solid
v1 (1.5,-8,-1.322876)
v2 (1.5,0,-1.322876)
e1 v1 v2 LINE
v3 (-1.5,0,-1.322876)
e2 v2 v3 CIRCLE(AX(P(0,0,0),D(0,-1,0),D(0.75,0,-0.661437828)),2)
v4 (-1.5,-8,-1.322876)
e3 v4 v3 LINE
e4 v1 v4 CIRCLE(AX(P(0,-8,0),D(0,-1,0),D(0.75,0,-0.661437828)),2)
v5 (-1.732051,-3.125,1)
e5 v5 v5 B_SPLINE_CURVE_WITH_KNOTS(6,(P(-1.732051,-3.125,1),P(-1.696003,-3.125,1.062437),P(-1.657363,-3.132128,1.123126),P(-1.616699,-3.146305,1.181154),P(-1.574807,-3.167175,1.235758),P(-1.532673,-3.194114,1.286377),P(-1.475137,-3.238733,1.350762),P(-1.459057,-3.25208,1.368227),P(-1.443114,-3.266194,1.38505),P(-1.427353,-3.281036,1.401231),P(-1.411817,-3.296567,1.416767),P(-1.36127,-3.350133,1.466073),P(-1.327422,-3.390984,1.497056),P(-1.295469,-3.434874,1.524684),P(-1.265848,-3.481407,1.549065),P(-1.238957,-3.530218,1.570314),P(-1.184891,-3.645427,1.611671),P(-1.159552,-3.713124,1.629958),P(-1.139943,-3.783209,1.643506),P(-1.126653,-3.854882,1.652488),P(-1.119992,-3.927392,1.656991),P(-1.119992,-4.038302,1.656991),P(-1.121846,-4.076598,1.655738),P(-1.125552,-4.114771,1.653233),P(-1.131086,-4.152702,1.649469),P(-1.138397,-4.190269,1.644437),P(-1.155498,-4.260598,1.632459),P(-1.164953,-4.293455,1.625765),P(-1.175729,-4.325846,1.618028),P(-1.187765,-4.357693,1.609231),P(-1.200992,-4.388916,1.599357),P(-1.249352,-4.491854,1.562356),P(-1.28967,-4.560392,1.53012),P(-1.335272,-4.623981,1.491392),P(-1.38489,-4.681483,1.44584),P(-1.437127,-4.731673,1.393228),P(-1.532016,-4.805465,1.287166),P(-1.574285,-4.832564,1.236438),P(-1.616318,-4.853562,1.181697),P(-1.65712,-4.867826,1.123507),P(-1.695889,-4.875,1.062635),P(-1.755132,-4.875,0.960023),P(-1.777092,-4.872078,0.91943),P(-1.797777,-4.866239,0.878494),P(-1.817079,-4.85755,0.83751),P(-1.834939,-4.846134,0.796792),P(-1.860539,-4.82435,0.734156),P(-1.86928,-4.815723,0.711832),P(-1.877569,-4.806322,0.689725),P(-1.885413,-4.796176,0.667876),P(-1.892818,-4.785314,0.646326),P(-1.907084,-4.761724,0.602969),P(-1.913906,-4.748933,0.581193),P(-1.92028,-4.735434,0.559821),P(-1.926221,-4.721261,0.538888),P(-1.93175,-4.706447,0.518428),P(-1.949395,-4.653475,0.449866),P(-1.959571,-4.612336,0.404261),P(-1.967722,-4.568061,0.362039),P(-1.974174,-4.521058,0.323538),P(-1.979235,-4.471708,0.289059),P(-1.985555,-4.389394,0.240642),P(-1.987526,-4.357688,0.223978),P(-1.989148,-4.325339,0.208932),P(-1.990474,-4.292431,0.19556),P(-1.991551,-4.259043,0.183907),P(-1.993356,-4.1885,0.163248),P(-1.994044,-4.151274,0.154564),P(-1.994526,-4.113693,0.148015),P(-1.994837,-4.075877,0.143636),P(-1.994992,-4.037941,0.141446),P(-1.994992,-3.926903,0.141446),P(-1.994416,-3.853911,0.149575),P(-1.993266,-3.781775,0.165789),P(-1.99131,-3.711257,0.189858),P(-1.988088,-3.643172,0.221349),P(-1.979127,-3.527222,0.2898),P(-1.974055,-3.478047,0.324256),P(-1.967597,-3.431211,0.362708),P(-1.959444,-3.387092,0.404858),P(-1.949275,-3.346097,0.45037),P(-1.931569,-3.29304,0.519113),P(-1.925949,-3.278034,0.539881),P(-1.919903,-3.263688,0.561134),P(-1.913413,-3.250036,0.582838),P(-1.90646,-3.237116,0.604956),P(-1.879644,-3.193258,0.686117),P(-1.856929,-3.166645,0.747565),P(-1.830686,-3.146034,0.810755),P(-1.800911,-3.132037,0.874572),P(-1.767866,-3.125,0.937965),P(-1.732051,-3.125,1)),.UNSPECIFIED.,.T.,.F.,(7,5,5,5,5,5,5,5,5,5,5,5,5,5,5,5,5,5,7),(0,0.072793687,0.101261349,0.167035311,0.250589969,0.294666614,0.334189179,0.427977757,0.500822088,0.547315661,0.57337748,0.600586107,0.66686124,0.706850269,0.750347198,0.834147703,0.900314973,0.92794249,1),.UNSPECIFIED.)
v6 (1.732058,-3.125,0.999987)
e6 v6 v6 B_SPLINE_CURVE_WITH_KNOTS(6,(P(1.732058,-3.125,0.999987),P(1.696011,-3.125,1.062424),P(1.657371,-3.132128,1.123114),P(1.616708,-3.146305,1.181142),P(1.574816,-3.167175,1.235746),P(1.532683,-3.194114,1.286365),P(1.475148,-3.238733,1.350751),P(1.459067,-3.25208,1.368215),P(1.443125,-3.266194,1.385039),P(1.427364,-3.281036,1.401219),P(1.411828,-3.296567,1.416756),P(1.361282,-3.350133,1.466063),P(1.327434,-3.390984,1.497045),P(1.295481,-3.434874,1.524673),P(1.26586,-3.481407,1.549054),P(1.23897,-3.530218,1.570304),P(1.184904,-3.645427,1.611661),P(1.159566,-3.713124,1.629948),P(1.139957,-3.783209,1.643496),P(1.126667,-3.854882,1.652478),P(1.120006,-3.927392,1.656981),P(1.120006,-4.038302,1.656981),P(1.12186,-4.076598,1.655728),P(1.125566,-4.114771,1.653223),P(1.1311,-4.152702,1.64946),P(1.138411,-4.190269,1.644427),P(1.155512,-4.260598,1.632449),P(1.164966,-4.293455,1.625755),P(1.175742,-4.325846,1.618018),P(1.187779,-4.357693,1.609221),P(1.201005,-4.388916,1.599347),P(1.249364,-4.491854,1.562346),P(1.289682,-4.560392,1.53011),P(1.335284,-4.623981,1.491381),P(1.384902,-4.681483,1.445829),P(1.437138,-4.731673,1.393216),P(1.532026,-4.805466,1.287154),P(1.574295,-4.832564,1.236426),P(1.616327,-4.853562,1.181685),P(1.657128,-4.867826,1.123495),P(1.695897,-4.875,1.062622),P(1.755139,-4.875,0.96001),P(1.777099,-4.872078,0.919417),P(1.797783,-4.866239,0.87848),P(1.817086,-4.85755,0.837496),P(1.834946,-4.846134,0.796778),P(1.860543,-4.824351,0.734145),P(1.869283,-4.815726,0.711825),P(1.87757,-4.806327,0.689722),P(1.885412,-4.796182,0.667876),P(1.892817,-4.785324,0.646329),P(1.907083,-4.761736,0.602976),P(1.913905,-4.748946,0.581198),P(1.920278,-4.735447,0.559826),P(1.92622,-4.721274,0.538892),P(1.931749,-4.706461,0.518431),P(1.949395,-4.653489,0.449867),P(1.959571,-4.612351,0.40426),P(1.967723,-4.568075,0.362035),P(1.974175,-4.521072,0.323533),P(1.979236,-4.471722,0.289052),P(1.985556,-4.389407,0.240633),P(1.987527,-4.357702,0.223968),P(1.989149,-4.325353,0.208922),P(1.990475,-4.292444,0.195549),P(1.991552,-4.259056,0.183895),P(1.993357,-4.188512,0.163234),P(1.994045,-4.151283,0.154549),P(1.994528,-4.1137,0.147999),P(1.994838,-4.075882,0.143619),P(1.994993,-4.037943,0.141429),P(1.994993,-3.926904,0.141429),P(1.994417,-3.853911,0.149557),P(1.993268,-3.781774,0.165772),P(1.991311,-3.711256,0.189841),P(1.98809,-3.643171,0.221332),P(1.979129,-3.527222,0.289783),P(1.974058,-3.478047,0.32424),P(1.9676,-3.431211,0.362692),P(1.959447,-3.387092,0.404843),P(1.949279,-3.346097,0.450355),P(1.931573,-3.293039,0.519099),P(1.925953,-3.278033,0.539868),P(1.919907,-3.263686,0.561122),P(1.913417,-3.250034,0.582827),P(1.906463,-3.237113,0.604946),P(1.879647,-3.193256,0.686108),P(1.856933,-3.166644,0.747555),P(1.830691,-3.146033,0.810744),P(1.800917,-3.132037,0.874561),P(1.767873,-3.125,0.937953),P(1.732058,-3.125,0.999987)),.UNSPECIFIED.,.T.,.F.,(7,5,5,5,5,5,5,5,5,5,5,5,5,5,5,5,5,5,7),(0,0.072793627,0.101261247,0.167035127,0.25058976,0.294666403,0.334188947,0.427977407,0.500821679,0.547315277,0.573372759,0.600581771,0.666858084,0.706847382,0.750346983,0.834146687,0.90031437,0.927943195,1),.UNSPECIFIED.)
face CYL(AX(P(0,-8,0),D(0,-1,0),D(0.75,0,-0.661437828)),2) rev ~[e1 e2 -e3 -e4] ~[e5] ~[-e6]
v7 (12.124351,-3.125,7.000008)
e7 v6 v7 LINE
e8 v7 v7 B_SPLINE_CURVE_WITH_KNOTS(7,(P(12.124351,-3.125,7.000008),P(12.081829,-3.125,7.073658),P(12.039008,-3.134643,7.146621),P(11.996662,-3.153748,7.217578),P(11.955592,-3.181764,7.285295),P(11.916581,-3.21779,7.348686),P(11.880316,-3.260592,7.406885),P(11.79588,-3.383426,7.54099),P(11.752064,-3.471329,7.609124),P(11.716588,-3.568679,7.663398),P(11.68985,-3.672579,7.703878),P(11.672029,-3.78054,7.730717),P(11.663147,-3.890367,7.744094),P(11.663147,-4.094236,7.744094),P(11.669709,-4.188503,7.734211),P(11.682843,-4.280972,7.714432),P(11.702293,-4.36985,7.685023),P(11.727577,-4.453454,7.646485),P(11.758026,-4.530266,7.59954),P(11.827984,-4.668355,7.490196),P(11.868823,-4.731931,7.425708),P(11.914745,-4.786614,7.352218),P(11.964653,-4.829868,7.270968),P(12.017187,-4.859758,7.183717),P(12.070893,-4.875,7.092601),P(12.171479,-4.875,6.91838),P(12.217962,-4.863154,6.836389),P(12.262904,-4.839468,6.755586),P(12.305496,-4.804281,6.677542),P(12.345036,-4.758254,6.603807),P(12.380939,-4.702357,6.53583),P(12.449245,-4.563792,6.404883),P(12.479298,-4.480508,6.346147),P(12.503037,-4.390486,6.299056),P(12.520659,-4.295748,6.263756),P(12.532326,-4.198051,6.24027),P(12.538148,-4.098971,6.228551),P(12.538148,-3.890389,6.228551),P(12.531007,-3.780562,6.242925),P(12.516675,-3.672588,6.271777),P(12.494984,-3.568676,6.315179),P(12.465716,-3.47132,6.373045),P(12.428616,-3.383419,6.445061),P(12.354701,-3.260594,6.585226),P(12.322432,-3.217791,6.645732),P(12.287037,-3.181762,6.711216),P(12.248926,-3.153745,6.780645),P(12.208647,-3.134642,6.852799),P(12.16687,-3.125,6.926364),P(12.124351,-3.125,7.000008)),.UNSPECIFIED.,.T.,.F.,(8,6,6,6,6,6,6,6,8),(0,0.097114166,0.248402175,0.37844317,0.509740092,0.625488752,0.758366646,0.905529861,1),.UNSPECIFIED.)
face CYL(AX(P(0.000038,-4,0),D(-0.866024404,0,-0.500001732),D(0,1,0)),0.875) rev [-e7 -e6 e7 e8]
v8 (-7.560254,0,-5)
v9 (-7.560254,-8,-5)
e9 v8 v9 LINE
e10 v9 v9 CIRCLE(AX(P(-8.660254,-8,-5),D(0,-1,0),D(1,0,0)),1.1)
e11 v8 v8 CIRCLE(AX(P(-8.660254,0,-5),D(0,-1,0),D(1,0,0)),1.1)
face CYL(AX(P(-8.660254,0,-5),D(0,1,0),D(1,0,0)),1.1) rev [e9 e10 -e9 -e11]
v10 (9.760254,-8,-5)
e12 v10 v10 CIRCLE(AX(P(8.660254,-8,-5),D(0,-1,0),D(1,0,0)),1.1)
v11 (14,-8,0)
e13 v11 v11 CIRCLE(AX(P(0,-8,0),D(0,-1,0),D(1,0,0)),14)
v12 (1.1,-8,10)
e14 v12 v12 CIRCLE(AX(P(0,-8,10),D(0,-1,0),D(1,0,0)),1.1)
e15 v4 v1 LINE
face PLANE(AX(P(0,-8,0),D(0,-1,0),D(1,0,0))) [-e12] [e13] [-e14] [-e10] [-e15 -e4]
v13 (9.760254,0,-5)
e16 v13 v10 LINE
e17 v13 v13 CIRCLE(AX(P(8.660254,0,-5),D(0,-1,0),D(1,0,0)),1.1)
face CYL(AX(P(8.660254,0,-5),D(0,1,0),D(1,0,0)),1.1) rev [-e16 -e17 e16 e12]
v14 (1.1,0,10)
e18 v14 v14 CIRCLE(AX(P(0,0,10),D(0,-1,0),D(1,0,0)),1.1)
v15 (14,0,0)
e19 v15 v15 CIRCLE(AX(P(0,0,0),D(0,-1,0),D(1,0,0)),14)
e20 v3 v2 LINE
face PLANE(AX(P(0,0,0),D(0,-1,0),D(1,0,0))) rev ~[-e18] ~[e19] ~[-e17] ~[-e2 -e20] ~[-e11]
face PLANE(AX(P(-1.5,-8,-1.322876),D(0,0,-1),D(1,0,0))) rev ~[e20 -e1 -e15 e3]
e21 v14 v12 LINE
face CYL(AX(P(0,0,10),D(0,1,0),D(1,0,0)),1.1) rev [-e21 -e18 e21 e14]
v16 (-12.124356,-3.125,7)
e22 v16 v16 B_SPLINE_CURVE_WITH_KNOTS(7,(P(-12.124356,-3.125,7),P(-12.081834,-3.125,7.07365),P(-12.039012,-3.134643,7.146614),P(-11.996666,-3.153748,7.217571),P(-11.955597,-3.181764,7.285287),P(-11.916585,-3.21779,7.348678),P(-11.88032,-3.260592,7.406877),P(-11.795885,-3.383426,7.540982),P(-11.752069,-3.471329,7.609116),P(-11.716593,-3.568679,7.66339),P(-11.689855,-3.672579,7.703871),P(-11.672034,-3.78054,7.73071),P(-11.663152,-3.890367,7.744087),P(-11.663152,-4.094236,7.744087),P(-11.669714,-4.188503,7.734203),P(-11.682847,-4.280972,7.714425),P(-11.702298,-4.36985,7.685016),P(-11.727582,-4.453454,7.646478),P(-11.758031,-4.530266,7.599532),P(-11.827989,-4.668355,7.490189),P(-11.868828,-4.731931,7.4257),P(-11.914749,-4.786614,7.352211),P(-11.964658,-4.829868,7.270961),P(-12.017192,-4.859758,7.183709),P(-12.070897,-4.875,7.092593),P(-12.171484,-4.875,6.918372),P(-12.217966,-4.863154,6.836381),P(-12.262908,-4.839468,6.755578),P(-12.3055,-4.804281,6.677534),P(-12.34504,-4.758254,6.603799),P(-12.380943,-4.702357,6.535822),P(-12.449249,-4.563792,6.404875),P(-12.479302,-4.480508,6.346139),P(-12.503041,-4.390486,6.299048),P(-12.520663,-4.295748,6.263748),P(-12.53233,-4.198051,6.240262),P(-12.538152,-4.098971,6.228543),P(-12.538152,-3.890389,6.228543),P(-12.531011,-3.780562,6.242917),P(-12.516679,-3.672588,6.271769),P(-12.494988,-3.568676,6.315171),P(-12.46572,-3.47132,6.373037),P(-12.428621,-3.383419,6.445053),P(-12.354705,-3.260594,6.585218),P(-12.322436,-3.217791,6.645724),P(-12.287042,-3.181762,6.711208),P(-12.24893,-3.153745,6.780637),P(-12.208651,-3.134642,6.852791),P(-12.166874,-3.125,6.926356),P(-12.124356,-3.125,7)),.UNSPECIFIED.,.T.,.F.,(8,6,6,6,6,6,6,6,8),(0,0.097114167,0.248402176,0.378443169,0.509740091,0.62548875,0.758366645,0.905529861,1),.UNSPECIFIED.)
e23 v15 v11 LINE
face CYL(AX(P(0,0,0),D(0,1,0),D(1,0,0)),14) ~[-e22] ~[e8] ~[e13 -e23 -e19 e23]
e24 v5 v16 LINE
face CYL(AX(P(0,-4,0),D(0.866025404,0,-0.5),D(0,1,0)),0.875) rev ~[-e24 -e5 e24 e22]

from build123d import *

# Parameters (mm, degrees)
F0_R     = 14
F0_R_2   = 1.1
F1_DEPTH = 8
F3_DEPTH = 8.001
F6_R     = 0.875
F7_DEPTH = 19.125355653


# Not quite as in the source:
# - a pattern or mirror of a feature is missing from the dataset's text; its kind, count and spacing are read off the source's solid


with BuildPart() as f1:
    # F0 (on Front) → F1 (new body)
    with BuildSketch(Plane.XZ):
        Circle(F0_R)
        with Locations((-8.6602540378, -5)):
            Circle(F0_R_2, mode=Mode.SUBTRACT)
        with Locations((8.6602540378, -5)):
            Circle(F0_R_2, mode=Mode.SUBTRACT)
        with Locations((0, 10)):
            Circle(F0_R_2, mode=Mode.SUBTRACT)
    extrude(amount=F1_DEPTH)

    # F2 (on face) → F3 (cut, through all)
    with BuildSketch(Plane.XZ.offset(8)):
        with BuildLine():
            Line((-1.5, -1.3228756555), (1.5, -1.3228756555))
            ThreePointArc((1.5, -1.3228756555), (0, 2), (-1.5, -1.3228756555))
        make_face()
    extrude(amount=-F3_DEPTH, mode=Mode.SUBTRACT)

    # F6 (on line) → F7 (cut, through all)
    with BuildSketch(Plane(origin=(0, 0, 0), x_dir=(0, 1, 0), z_dir=(0.8660254038, 0, -0.5))):
        with Locations((-4, 0)):
            Circle(F6_R)
    f7 = extrude(amount=-F7_DEPTH, mode=Mode.SUBTRACT)

    # F7_copies: F7 across plane
    add(f7.mirror(Plane(origin=(1.9e-05, 0, 0), x_dir=(-1e-06, 0, 1), z_dir=(1, 0, 1e-06))), mode=Mode.SUBTRACT)


solid = f1.part
